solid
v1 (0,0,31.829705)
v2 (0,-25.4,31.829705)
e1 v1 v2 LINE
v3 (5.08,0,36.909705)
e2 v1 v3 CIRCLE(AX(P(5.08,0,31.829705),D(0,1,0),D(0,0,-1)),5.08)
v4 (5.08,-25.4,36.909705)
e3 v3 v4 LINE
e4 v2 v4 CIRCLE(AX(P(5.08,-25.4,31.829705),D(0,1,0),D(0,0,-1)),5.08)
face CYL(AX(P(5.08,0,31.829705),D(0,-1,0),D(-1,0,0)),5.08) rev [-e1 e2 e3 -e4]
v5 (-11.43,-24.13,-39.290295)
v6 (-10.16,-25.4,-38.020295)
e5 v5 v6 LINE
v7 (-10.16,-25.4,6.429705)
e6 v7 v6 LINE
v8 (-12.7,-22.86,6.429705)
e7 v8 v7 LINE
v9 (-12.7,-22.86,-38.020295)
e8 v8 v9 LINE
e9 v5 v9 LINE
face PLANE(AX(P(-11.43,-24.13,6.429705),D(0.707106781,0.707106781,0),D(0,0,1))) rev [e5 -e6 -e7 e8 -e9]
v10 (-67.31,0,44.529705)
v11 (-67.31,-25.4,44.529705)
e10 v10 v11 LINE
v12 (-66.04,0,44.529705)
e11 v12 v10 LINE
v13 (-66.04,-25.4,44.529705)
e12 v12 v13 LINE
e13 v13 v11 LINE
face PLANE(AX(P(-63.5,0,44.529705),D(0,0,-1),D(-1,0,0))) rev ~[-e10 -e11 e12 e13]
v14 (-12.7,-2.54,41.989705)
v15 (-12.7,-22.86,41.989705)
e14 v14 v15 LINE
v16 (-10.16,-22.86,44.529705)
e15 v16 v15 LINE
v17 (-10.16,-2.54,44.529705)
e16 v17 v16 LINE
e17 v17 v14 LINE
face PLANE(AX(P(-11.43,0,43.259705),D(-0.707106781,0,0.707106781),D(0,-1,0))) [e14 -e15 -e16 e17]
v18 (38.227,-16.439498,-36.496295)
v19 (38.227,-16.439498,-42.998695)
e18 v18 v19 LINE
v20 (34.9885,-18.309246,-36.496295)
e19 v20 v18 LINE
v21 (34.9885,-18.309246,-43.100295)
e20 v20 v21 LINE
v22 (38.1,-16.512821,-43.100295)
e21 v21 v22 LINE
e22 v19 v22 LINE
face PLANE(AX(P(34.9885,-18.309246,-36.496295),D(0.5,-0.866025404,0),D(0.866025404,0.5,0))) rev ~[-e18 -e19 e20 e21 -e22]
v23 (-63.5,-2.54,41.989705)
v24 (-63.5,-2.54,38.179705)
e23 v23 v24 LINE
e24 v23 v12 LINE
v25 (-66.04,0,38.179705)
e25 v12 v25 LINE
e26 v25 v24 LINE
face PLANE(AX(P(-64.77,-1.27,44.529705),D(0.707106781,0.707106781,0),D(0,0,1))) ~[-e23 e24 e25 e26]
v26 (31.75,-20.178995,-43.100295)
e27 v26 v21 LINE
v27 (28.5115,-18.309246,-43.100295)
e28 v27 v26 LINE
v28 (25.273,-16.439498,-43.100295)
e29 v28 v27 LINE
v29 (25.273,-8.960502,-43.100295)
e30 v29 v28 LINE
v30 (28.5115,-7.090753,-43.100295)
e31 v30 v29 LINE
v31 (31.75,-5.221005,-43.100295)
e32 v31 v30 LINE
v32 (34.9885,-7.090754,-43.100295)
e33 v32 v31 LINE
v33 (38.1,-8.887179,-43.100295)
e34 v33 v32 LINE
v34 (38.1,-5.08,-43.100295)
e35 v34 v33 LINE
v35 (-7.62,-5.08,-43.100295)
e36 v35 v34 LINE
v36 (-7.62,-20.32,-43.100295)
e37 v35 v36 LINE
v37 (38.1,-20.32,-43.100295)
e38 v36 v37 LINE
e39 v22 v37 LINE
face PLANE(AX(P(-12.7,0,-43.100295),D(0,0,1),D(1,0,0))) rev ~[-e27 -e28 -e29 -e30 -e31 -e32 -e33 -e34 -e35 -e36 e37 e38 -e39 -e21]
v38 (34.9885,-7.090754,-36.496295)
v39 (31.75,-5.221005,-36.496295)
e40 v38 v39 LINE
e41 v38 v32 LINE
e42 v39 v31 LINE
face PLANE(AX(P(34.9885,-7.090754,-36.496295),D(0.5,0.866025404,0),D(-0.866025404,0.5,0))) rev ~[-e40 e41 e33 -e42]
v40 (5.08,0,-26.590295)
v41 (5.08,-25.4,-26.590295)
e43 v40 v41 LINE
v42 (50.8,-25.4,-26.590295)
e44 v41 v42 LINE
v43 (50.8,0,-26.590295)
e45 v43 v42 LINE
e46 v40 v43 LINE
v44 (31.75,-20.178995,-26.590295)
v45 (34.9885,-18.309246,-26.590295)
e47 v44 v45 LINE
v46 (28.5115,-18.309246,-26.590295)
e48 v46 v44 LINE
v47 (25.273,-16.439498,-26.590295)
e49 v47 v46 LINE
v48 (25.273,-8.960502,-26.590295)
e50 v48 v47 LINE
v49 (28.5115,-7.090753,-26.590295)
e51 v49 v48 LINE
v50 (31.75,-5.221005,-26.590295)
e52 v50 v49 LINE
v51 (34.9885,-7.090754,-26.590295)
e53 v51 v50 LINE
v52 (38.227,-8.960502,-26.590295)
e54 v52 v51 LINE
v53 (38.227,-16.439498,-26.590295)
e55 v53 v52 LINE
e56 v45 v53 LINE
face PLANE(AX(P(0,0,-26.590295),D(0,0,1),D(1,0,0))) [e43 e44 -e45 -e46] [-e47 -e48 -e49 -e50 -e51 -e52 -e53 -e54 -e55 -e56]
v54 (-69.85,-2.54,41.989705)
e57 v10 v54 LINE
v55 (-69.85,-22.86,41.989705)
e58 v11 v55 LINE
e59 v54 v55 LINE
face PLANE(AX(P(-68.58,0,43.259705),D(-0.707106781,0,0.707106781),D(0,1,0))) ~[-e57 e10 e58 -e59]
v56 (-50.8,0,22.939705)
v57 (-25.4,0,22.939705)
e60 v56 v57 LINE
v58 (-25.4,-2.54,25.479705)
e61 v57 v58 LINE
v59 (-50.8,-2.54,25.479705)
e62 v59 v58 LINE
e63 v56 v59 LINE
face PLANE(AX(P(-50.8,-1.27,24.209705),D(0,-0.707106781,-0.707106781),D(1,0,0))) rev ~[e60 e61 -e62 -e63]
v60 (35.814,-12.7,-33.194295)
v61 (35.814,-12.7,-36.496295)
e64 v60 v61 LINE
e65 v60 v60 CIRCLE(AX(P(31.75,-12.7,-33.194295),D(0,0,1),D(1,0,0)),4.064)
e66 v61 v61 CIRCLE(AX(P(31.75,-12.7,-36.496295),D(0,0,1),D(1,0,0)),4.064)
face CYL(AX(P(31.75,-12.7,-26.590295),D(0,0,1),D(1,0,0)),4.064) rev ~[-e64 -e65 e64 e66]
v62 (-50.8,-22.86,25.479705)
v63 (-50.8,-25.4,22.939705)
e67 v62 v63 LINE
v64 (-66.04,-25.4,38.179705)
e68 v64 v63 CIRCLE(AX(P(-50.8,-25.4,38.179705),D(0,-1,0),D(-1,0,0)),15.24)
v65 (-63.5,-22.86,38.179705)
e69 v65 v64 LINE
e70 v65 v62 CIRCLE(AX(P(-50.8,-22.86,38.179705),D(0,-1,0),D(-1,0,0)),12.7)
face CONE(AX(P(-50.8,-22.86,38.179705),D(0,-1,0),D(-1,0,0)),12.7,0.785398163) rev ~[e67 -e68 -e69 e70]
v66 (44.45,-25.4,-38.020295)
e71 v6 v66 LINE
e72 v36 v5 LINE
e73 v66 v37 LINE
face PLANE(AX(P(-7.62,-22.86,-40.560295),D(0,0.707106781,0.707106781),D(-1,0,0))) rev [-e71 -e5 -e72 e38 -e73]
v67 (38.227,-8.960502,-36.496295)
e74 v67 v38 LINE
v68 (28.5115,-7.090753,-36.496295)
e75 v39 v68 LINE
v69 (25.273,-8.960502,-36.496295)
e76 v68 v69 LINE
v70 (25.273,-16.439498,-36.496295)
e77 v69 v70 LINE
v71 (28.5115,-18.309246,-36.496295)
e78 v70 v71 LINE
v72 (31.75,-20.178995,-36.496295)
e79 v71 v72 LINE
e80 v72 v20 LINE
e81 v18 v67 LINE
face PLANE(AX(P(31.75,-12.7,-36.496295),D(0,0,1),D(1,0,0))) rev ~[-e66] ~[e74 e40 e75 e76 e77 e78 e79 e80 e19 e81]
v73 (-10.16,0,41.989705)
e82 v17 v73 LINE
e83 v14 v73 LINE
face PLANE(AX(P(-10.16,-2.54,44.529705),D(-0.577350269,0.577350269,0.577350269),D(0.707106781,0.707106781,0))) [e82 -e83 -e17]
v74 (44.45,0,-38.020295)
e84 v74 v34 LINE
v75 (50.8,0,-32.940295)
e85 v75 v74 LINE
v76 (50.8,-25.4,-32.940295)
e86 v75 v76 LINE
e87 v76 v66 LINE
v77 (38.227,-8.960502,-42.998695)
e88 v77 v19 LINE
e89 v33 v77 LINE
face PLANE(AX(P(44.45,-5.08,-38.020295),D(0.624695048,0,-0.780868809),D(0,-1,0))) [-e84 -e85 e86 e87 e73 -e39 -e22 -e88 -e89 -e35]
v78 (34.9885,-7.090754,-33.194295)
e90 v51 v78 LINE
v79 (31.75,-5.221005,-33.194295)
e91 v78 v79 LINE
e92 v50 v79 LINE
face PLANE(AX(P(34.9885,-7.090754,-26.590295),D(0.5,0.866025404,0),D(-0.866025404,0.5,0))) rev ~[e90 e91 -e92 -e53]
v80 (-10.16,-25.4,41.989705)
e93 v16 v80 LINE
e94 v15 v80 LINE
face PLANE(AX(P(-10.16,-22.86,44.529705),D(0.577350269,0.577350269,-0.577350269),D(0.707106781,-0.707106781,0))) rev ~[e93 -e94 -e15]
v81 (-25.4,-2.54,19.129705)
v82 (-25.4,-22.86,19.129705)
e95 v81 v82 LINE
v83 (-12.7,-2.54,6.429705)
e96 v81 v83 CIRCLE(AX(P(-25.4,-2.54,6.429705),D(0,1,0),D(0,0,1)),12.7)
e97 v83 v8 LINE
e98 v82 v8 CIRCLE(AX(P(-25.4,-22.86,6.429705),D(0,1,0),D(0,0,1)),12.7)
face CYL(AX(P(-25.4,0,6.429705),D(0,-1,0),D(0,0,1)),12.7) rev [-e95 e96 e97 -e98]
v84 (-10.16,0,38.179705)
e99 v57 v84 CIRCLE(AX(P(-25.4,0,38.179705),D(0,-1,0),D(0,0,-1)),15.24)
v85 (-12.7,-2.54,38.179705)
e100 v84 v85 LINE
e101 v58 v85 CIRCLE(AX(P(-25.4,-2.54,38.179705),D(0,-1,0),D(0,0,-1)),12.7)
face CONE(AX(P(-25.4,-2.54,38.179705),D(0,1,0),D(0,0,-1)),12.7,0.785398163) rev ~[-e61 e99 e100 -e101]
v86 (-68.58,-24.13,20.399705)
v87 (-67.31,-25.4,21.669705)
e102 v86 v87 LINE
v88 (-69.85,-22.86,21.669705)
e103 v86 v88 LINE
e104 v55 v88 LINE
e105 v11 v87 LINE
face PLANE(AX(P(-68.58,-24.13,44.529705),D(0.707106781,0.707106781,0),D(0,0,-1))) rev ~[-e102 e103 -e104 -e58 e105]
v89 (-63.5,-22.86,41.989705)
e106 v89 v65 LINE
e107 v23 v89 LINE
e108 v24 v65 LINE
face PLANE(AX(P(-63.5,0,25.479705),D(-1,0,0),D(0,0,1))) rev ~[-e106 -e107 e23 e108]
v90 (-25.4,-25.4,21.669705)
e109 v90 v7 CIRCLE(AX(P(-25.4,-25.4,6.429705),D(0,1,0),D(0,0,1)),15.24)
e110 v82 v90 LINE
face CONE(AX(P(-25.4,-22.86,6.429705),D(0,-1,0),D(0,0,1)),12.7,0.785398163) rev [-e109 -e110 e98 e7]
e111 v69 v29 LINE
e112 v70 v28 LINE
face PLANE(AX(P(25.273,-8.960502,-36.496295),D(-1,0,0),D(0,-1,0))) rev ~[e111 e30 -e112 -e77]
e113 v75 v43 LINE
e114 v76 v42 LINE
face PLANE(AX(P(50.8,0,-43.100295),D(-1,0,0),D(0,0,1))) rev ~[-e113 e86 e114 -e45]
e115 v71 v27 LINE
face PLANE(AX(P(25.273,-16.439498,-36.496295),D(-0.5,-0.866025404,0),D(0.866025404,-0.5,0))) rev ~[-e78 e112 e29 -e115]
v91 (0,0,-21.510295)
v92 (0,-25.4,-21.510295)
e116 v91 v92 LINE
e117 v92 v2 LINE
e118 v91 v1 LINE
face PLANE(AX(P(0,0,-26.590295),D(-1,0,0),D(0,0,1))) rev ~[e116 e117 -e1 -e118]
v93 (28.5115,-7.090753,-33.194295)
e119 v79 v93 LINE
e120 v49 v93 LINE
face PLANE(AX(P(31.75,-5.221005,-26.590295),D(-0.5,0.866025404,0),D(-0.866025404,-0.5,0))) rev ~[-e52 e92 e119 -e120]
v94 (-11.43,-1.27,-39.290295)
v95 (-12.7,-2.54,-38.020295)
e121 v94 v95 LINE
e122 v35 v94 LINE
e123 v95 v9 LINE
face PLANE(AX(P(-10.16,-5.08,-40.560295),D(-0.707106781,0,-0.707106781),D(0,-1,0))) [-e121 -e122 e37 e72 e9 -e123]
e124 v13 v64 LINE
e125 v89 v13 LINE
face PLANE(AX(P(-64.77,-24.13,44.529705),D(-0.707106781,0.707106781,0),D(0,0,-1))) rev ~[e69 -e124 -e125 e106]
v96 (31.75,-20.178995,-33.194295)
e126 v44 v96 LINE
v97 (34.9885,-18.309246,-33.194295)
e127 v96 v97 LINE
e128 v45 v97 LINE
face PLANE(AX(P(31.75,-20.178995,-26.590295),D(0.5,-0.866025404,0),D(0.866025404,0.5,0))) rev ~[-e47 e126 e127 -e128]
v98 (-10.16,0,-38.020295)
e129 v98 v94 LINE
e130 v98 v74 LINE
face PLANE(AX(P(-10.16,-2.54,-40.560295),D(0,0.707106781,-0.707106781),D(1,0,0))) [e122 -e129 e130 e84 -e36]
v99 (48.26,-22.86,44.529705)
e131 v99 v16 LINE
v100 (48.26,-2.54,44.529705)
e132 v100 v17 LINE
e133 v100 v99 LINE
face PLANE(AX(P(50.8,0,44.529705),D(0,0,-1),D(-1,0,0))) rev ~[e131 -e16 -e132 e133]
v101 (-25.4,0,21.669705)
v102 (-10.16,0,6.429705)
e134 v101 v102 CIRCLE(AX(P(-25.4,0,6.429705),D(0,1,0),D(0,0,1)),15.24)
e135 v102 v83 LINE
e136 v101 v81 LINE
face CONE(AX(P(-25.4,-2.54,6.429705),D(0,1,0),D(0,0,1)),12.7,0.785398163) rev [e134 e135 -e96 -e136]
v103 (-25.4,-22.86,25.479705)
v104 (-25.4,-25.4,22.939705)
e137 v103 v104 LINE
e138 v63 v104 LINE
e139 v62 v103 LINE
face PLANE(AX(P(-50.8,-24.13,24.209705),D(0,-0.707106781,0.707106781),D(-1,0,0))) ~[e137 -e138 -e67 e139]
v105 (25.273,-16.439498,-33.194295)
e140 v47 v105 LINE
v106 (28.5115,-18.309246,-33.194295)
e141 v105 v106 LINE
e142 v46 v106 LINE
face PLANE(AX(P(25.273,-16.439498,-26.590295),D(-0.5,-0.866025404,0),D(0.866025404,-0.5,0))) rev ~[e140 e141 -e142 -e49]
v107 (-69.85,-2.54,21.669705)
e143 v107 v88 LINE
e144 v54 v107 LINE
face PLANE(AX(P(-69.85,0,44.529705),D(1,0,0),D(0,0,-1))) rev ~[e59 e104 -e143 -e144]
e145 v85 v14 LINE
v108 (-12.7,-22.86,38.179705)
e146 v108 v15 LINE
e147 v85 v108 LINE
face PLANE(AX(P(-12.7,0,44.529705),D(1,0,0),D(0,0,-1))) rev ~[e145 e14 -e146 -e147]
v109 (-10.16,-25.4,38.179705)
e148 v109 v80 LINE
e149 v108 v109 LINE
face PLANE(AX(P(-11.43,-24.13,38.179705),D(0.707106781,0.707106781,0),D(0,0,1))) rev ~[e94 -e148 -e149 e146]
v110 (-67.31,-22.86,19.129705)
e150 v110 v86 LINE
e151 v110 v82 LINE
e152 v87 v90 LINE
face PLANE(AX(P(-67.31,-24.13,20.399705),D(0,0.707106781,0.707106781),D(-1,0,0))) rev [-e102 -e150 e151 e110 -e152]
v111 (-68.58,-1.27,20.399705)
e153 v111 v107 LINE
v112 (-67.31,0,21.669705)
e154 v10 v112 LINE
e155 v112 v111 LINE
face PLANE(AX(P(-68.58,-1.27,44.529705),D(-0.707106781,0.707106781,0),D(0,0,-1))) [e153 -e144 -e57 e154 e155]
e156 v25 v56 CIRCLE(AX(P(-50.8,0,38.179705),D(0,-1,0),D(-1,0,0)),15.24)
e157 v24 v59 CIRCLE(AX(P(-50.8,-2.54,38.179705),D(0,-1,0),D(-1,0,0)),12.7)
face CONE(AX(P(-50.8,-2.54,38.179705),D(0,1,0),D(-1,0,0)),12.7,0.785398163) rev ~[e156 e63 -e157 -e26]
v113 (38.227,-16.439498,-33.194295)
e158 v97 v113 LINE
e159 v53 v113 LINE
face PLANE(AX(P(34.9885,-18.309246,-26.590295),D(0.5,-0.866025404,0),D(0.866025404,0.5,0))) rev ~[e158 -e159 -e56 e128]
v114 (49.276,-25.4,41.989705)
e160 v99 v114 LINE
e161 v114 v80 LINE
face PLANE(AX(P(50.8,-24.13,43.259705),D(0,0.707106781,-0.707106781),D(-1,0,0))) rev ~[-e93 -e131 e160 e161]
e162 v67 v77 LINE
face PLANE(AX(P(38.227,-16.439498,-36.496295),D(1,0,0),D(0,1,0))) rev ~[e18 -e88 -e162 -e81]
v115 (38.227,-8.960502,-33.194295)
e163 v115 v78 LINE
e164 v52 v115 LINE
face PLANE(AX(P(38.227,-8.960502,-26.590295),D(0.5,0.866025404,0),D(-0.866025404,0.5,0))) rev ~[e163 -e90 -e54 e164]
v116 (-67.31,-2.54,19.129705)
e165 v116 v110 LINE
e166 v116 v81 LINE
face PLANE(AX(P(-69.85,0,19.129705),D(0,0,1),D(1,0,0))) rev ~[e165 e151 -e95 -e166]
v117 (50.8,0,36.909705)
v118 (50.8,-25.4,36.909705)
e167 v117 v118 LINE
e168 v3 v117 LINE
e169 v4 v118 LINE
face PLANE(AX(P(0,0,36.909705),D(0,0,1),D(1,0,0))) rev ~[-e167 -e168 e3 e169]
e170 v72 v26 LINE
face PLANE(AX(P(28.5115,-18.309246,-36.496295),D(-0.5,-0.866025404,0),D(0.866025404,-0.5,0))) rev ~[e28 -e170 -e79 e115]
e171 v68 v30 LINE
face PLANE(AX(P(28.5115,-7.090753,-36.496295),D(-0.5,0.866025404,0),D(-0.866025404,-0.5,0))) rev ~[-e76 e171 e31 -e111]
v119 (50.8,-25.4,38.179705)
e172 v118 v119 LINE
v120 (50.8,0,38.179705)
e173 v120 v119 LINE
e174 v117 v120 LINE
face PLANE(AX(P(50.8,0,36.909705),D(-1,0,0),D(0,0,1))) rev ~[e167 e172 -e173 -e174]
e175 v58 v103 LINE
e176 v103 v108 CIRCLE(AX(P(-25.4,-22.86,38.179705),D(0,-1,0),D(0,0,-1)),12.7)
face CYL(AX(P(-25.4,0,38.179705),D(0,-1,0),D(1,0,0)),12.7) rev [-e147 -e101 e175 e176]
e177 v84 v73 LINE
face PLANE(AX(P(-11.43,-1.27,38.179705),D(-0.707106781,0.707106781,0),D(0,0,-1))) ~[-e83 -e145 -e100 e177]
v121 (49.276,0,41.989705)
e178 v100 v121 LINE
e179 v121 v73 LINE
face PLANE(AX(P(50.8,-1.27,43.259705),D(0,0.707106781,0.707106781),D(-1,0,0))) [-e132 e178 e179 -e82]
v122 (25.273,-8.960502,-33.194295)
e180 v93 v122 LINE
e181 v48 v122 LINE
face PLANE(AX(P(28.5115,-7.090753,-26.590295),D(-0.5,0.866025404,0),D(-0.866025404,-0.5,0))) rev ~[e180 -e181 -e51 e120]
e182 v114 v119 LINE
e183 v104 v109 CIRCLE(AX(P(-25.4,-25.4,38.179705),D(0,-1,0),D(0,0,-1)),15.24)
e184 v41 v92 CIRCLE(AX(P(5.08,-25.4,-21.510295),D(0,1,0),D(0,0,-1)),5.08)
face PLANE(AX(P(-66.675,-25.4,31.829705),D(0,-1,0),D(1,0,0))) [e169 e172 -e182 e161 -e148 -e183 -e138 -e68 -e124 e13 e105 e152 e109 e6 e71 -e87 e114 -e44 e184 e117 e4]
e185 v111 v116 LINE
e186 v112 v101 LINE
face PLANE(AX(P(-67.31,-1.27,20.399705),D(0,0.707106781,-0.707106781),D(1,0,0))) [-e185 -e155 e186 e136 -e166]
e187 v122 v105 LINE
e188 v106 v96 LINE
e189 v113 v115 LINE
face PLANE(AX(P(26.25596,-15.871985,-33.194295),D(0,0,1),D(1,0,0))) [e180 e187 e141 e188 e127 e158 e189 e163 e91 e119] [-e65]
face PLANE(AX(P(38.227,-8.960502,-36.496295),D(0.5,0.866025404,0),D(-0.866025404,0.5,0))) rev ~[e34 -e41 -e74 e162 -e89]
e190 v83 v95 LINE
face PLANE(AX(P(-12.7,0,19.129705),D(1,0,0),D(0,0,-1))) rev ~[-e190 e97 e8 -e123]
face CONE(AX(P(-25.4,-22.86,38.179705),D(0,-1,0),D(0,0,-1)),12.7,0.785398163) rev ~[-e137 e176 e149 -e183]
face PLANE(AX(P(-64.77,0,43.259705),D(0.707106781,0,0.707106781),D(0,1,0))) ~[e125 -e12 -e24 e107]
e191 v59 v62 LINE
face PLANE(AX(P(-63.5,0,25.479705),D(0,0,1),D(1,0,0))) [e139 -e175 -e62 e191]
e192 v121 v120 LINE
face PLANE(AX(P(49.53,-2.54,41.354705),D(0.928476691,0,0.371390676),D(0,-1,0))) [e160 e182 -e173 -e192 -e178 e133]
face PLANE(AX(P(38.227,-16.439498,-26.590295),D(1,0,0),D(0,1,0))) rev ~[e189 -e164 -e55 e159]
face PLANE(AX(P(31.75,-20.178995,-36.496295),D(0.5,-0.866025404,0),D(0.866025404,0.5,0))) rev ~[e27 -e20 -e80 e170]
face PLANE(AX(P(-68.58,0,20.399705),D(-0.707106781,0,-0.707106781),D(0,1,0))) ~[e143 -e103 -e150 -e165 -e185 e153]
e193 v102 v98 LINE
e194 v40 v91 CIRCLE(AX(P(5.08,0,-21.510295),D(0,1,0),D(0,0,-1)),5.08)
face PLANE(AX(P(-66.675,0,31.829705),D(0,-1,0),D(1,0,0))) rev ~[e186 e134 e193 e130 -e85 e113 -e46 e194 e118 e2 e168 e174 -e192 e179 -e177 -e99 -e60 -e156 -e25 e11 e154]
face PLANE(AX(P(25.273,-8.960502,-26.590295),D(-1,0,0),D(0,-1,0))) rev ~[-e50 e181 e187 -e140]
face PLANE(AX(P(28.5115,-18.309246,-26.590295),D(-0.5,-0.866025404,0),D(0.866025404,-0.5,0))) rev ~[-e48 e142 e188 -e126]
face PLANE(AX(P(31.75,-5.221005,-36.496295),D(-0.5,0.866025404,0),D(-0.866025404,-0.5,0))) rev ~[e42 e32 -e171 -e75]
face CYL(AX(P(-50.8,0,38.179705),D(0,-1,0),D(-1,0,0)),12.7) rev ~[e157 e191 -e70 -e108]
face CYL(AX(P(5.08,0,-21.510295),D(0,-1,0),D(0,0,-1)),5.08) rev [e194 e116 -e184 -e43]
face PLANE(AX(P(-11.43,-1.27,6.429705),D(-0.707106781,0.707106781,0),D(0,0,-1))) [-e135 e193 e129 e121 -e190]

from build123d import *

# Parameters (mm, degrees)
F0_W       = 50.8
F0_H       = 6.35
F0_H_2     = 7.62
F0_H_3     = 16.51
F1_DEPTH   = 25.4
F2_R       = 12.7
F3_SIZE    = 2.54
F4_R       = 12.7
F5_SIZE    = 2.54
F6_R       = 5.08
F8_C1_SIZE = 5.08
F8_C2_SIZE = 5.08
F8_C3_SIZE = 5.08
F9_SIZE2   = 12.7
F9_SIZE    = 10.16
F10_SIZE2  = 6.35
F10_SIZE   = 2.54
F11_DEPTH  = 6.604
F12_START  = -9.906
F12_DEPTH  = 6.605
F13_D      = 8.128
F13_DEPTH  = 16.511


with BuildPart() as f1:
    # F0 (on Front) → F1 (new body)
    with BuildSketch(Plane.XZ):
        Polygon((-63.5, 19.1297054841), (-63.5, 25.4797054841), (-63.5, 44.5297054841), (-69.85, 44.5297054841), (-69.85, 19.1297054841), align=None)
        with Locations((-38.1, 22.3047054841)):
            Rectangle(F0_W, F0_H)
        Polygon((0, 36.9097054841), (0, 44.5297054841), (-12.7, 44.5297054841), (-12.7, 25.4797054841), (-12.7, 19.1297054841), (-12.7, -43.1002945159), (0, -43.1002945159), (0, -26.5902945159), align=None)
        with Locations((25.4, 40.7197054841)):
            Rectangle(F0_W, F0_H_2)
        with Locations((25.4, -34.8452945159)):
            Rectangle(F0_W, F0_H_3)
    extrude(amount=F1_DEPTH)

    # F2
    f2_edges = [f1.edges().sort_by_distance(p)[0] for p in [
        (-12.7, -12.7, 25.479705),
        (-63.5, -12.7, 25.479705),
    ]]
    fillet(f2_edges, radius=F2_R)

    # F3
    f3_edges = [f1.edges().sort_by_distance(p)[0] for p in [
        (-63.5, -12.7, 44.529705),
        (-69.85, 0, 31.829705),
        (-69.85, -12.7, 44.529705),
        (-69.85, -25.4, 31.829705),
        (-59.780256, -25.4, 29.199449),
        (-38.1, 0, 25.479705),
        (-12.7, -12.7, 44.529705),
        (19.05, -25.4, 44.529705),
        (19.05, 0, 44.529705),
        (-69.85, -12.7, 19.129705),
    ]]
    chamfer(f3_edges, length=F3_SIZE)

    # F4
    f4_edges = [f1.edges().sort_by_distance(p)[0] for p in [
        (-12.7, -12.7, 19.129705),
    ]]
    fillet(f4_edges, radius=F4_R)

    # F5
    f5_edges = [f1.edges().sort_by_distance(p)[0] for p in [
        (-12.7, -25.4, -18.335295),
        (-12.7, 0, -18.335295),
    ]]
    chamfer(f5_edges, length=F5_SIZE)

    # F6
    f6_edges = [f1.edges().sort_by_distance(p)[0] for p in [
        (0, -12.7, 36.909705),
        (0, -12.7, -26.590295),
    ]]
    fillet(f6_edges, radius=F6_R)

    # F8: chamfer of 5.08 on 5 edges, made by hand

    # F8_c1
    f8_c1_edges = [f1.edges().sort_by_distance(p)[0] for p in [
        (20.32, 0, -43.1002945159),
    ]]
    chamfer(f8_c1_edges, length=F8_C1_SIZE)

    # F8_c2
    f8_c2_edges = [f1.edges().sort_by_distance(p)[0] for p in [
        (-12.7, -13.97, -43.1002945159),
    ]]
    chamfer(f8_c2_edges, length=F8_C2_SIZE)

    # F8_c3
    f8_c3_edges = [f1.edges().sort_by_distance(p)[0] for p in [
        (21.59, -25.4, -43.1002945159),
    ]]
    chamfer(f8_c3_edges, length=F8_C3_SIZE)

    # F9
    f9_edges = [f1.edges().sort_by_distance(p)[0] for p in [
        (50.8, -12.7, -43.100295),
    ]]
    f9_side = f1.faces().sort_by_distance((50.8, -12.7, -34.415021))[0]
    chamfer(f9_edges, length=F9_SIZE, length2=F9_SIZE2, reference=f9_side)

    # F10
    f10_edges = [f1.edges().sort_by_distance(p)[0] for p in [
        (50.8, -12.7, 44.529705),
    ]]
    f10_side = f1.faces().sort_by_distance((20.32, -12.7, 44.529705))[0]
    chamfer(f10_edges, length=F10_SIZE, length2=F10_SIZE2, reference=f10_side)

    # F7 (on face) → F11 (cut)
    with BuildSketch(Plane.XY.offset(-26.5902945159)):
        with BuildLine():
            Line((25.273, -16.4394976935), (28.5114998927, -18.3092464784))
            ThreePointArc((28.5114998927, -18.3092464784), (26.1407534287, -15.9384999464), (25.273, -12.7))
            Line((25.273, -12.7), (25.273, -16.4394976935))
        make_face()
        with BuildLine():
            ThreePointArc((25.273, -12.7), (26.1407534711, -9.4614999803), (28.5115000394, -7.0907534369))
            Line((28.5115000394, -7.0907534369), (25.273, -8.9605023065))
            Line((25.273, -8.9605023065), (25.273, -12.7))
        make_face()
        with BuildLine():
            ThreePointArc((28.5115000394, -7.0907534369), (31.7500001819, -6.223), (34.9885002756, -7.0907536188))
            Line((34.9885002756, -7.0907536188), (31.75, -5.2210046129))
            Line((31.75, -5.2210046129), (28.5115000394, -7.0907534369))
        make_face()
        with BuildLine():
            ThreePointArc((34.9885002756, -7.0907536188), (37.3592466199, -9.4615001378), (38.227, -12.7))
            Line((38.227, -12.7), (38.227, -8.9605023065))
            Line((38.227, -8.9605023065), (34.9885002756, -7.0907536188))
        make_face()
        with BuildLine():
            Line((38.227, -16.4394976935), (38.227, -12.7))
            ThreePointArc((38.227, -12.7), (37.3592466025, -15.9384998923), (34.9885002155, -18.3092464159))
            Line((34.9885002155, -18.3092464159), (38.227, -16.4394976935))
        make_face()
        with BuildLine():
            Line((31.75, -20.1789953871), (34.9885002155, -18.3092464159))
            ThreePointArc((34.9885002155, -18.3092464159), (31.7500000625, -19.177), (28.5114998927, -18.3092464784))
            Line((28.5114998927, -18.3092464784), (31.75, -20.1789953871))
        make_face()
        with BuildLine():
            ThreePointArc((34.9885002155, -18.3092464159), (37.3592466025, -15.9384998923), (38.227, -12.7))
            ThreePointArc((38.227, -12.7), (37.3592466199, -9.4615001378), (34.9885002756, -7.0907536188))
            ThreePointArc((34.9885002756, -7.0907536188), (31.7500001819, -6.223), (28.5115000394, -7.0907534369))
            ThreePointArc((28.5115000394, -7.0907534369), (26.1407534711, -9.4614999803), (25.273, -12.7))
            ThreePointArc((25.273, -12.7), (26.1407534287, -15.9384999464), (28.5114998927, -18.3092464784))
            ThreePointArc((28.5114998927, -18.3092464784), (31.7500000625, -19.177), (34.9885002155, -18.3092464159))
        make_face()
    extrude(amount=-F11_DEPTH, mode=Mode.SUBTRACT)

    # F7 (on face) → F12 (cut)
    with BuildSketch(Plane.XY.offset(-26.5902945159).offset(F12_START)):
        with BuildLine():
            ThreePointArc((34.9885002155, -18.3092464159), (37.3592466025, -15.9384998923), (38.227, -12.7))
            ThreePointArc((38.227, -12.7), (37.3592466199, -9.4615001378), (34.9885002756, -7.0907536188))
            ThreePointArc((34.9885002756, -7.0907536188), (31.7500001819, -6.223), (28.5115000394, -7.0907534369))
            ThreePointArc((28.5115000394, -7.0907534369), (26.1407534711, -9.4614999803), (25.273, -12.7))
            ThreePointArc((25.273, -12.7), (26.1407534287, -15.9384999464), (28.5114998927, -18.3092464784))
            ThreePointArc((28.5114998927, -18.3092464784), (31.7500000625, -19.177), (34.9885002155, -18.3092464159))
        make_face()
        with BuildLine():
            Line((38.227, -16.4394976935), (38.227, -12.7))
            ThreePointArc((38.227, -12.7), (37.3592466025, -15.9384998923), (34.9885002155, -18.3092464159))
            Line((34.9885002155, -18.3092464159), (38.227, -16.4394976935))
        make_face()
        with BuildLine():
            ThreePointArc((28.5115000394, -7.0907534369), (31.7500001819, -6.223), (34.9885002756, -7.0907536188))
            Line((34.9885002756, -7.0907536188), (31.75, -5.2210046129))
            Line((31.75, -5.2210046129), (28.5115000394, -7.0907534369))
        make_face()
        with BuildLine():
            ThreePointArc((34.9885002756, -7.0907536188), (37.3592466199, -9.4615001378), (38.227, -12.7))
            Line((38.227, -12.7), (38.227, -8.9605023065))
            Line((38.227, -8.9605023065), (34.9885002756, -7.0907536188))
        make_face()
        with BuildLine():
            ThreePointArc((25.273, -12.7), (26.1407534711, -9.4614999803), (28.5115000394, -7.0907534369))
            Line((28.5115000394, -7.0907534369), (25.273, -8.9605023065))
            Line((25.273, -8.9605023065), (25.273, -12.7))
        make_face()
        with BuildLine():
            Line((25.273, -16.4394976935), (28.5114998927, -18.3092464784))
            ThreePointArc((28.5114998927, -18.3092464784), (26.1407534287, -15.9384999464), (25.273, -12.7))
            Line((25.273, -12.7), (25.273, -16.4394976935))
        make_face()
        with BuildLine():
            Line((31.75, -20.1789953871), (34.9885002155, -18.3092464159))
            ThreePointArc((34.9885002155, -18.3092464159), (31.7500000625, -19.177), (28.5114998927, -18.3092464784))
            Line((28.5114998927, -18.3092464784), (31.75, -20.1789953871))
        make_face()
    extrude(amount=-F12_DEPTH, mode=Mode.SUBTRACT)

    # F13 (through all, one way)
    with BuildSketch(Plane.XY.offset(-26.5902945159)):
        with Locations((31.75, -12.7)):
            Circle(F13_D / 2)
    extrude(amount=-F13_DEPTH, mode=Mode.SUBTRACT)


solid = f1.part
